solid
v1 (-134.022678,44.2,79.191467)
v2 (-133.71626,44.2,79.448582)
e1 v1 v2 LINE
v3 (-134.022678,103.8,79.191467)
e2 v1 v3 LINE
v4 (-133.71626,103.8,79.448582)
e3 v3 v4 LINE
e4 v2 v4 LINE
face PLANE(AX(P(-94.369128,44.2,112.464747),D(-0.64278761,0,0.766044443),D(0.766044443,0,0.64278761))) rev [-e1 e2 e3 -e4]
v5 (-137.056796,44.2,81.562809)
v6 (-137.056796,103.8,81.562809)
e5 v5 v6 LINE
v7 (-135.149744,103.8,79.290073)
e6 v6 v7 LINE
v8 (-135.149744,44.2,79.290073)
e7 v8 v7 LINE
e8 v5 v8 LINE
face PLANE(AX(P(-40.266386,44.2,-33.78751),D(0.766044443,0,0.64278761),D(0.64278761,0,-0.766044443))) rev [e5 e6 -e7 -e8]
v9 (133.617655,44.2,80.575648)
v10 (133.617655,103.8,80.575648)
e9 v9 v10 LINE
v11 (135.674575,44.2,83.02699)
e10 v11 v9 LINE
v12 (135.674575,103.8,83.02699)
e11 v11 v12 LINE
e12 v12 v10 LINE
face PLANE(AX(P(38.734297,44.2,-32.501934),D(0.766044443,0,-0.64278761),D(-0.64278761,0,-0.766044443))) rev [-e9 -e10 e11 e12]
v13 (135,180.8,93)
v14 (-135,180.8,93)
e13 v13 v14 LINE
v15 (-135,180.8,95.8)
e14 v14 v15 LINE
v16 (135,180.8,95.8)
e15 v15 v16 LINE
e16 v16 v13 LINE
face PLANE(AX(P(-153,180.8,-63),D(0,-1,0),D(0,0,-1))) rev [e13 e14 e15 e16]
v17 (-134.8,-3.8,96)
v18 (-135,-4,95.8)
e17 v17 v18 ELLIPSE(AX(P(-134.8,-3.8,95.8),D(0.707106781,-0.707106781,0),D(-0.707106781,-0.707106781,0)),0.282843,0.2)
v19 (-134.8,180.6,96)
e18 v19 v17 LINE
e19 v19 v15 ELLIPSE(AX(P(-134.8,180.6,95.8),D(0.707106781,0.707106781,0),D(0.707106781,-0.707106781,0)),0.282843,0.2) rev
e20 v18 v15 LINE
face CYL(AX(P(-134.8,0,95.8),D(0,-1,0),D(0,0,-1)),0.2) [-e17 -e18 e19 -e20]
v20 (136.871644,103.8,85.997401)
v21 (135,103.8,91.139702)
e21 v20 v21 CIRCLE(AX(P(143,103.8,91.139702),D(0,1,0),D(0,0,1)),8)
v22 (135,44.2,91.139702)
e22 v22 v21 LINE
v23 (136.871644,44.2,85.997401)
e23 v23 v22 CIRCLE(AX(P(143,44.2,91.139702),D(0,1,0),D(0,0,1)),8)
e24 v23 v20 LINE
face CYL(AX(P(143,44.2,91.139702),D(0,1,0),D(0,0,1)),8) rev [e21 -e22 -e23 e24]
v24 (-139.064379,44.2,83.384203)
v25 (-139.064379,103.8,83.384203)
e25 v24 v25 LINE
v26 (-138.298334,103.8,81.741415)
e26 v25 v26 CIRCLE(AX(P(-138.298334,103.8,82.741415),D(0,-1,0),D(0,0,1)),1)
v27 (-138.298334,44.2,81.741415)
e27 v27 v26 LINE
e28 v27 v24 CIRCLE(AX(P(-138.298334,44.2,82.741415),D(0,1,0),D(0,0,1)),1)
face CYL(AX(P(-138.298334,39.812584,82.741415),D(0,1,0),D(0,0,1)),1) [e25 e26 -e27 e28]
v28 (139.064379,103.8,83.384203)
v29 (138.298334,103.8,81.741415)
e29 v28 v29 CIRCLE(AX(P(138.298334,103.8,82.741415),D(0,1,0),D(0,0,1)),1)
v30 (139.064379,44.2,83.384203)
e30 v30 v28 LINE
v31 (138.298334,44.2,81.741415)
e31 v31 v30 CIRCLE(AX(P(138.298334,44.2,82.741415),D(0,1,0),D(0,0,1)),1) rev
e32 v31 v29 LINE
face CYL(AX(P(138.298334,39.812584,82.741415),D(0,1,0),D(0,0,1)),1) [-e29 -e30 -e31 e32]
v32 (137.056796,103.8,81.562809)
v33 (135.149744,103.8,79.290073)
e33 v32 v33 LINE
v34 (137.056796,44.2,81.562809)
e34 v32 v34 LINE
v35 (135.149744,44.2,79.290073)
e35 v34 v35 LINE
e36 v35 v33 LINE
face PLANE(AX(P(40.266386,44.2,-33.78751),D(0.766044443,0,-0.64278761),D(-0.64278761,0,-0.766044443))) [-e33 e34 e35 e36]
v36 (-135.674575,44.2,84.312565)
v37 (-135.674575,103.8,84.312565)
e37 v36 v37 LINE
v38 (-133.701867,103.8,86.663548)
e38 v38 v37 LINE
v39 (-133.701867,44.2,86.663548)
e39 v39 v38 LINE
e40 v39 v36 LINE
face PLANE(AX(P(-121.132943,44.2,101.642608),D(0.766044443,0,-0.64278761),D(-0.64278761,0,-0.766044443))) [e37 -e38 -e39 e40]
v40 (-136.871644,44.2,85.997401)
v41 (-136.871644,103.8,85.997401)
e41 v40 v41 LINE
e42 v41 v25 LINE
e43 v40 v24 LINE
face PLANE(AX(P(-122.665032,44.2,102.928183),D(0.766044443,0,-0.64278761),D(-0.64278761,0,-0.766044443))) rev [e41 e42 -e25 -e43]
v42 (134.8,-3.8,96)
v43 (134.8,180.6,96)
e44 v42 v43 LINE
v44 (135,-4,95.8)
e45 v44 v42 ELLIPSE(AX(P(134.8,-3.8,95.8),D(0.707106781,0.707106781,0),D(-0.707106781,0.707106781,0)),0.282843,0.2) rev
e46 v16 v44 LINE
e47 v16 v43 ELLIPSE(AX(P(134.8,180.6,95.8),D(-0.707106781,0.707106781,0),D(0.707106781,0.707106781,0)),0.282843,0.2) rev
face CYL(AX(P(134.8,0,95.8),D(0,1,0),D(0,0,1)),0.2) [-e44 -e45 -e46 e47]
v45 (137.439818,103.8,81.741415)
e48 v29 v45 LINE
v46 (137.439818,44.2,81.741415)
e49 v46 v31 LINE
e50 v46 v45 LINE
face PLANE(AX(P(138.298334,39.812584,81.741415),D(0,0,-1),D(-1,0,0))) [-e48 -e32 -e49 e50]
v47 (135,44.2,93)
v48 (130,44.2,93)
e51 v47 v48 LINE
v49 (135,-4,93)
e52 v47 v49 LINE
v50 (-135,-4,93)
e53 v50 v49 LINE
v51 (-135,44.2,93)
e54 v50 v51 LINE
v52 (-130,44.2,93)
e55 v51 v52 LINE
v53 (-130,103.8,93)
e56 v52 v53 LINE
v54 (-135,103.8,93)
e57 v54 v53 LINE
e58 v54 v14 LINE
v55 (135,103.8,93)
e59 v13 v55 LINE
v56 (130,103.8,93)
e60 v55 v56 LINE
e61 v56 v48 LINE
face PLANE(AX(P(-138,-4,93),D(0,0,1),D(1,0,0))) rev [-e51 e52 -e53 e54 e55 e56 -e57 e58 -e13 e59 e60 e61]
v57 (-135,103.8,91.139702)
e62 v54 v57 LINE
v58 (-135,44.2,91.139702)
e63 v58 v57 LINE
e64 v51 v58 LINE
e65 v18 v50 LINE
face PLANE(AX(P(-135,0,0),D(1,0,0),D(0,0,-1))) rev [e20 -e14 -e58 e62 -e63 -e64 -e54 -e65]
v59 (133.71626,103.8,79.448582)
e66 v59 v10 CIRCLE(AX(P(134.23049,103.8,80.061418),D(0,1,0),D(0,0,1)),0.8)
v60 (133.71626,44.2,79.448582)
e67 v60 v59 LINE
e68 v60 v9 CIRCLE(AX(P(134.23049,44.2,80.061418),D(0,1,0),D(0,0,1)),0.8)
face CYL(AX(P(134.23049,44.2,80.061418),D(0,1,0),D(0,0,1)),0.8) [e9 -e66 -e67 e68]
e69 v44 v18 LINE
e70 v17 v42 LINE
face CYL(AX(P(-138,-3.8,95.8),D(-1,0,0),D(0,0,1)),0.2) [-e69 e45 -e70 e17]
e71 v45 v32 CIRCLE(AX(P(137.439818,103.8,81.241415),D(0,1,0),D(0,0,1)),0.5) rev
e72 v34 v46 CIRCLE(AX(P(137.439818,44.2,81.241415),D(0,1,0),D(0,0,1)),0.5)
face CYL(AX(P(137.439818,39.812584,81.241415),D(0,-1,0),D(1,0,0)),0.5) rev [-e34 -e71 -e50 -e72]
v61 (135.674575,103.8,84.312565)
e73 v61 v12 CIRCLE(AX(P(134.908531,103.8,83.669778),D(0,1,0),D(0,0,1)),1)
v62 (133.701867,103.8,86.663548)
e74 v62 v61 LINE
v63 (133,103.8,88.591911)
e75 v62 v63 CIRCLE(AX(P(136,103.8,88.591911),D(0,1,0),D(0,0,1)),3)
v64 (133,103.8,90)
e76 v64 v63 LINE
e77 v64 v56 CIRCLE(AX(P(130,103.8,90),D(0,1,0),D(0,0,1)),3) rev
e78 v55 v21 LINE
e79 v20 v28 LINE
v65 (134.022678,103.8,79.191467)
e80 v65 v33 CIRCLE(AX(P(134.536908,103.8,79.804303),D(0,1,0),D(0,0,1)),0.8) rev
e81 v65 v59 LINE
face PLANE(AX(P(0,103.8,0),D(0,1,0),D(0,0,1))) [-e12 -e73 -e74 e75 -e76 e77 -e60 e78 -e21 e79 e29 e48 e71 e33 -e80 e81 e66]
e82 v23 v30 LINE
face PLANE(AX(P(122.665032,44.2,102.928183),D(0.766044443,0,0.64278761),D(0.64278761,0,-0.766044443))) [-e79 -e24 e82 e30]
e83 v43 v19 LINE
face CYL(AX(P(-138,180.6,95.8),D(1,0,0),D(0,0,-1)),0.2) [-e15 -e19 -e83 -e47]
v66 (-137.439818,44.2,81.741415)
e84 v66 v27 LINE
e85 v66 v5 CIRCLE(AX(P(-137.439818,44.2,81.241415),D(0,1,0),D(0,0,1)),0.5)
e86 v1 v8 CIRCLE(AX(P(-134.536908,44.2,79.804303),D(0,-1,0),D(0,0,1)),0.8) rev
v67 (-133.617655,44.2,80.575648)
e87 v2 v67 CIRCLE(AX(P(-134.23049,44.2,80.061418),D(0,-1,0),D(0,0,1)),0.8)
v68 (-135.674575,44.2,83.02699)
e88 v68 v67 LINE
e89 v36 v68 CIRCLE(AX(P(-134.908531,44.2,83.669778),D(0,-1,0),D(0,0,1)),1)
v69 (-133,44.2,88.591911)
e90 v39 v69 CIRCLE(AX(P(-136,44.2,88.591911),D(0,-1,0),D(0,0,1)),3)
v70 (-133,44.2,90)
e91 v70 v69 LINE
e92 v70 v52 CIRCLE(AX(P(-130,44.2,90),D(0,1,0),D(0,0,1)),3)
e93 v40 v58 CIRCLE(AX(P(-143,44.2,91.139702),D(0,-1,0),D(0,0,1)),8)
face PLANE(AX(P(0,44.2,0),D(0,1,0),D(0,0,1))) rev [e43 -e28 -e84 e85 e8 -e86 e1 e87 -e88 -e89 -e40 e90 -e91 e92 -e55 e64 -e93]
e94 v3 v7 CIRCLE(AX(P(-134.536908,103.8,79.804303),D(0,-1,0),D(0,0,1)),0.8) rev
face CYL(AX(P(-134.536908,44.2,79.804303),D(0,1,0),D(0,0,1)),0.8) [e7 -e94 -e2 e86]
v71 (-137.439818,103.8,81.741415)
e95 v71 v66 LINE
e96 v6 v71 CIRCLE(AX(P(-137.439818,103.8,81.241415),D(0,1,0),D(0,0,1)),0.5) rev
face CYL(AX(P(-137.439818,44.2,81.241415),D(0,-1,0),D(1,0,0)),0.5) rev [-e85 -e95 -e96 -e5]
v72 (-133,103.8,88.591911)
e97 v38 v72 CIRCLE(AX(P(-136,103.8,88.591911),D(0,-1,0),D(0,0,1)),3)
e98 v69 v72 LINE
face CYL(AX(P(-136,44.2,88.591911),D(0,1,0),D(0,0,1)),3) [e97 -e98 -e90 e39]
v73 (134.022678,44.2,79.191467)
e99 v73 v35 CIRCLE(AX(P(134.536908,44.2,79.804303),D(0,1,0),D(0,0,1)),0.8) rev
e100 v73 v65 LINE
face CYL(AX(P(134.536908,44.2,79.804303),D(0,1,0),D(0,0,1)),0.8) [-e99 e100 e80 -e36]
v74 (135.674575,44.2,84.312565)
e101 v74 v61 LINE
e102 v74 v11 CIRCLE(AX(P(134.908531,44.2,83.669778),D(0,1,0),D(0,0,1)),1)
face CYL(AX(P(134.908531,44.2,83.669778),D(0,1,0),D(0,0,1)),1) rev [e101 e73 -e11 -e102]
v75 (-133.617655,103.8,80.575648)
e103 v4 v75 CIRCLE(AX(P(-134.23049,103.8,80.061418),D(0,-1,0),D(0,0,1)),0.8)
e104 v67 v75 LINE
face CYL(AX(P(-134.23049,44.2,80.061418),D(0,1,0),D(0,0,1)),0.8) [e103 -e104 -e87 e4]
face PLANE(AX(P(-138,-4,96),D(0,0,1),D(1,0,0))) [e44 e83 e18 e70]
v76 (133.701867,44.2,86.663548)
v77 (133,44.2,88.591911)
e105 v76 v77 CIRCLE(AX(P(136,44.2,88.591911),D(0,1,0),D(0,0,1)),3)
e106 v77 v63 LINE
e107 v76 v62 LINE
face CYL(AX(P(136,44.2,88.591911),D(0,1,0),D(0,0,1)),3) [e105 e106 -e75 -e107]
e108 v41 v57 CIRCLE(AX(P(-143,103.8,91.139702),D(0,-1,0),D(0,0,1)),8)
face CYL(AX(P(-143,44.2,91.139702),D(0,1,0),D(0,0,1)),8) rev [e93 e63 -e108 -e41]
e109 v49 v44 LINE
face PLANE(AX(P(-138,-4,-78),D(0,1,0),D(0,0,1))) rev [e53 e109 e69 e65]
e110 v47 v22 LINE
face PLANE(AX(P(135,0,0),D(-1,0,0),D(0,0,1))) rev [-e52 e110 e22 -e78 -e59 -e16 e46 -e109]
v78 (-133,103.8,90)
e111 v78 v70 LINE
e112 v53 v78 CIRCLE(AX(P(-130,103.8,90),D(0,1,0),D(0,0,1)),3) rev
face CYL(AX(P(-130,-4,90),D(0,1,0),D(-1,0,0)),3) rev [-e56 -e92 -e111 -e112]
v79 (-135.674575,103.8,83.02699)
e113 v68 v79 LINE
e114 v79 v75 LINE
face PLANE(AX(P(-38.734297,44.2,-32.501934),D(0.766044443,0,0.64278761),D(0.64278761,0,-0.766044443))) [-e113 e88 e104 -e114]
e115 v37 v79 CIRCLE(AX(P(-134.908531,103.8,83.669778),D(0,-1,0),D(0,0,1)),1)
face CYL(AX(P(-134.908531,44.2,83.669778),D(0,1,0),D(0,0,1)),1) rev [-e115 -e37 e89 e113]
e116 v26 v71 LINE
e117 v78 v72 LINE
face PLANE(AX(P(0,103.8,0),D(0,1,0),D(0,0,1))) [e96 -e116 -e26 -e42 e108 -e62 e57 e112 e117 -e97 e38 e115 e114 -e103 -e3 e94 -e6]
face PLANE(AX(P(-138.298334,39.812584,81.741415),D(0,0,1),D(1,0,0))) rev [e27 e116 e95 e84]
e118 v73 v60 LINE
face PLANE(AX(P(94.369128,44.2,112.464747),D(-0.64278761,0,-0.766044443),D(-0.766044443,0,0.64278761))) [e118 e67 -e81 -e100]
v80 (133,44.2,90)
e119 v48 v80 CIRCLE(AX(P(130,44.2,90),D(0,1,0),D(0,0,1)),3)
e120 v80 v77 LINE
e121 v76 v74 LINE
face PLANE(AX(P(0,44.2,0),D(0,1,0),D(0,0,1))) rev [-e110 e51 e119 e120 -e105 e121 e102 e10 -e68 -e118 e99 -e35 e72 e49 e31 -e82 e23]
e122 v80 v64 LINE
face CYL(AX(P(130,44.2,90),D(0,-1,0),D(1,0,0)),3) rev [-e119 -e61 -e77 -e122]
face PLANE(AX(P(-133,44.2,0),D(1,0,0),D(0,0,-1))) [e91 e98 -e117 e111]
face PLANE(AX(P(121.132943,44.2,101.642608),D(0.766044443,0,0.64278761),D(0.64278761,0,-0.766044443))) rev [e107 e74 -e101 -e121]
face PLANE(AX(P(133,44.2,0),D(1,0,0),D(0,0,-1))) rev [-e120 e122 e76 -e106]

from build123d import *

# Parameters (mm, degrees)
STOCK_OUTTER_CASE_1_START     = -135
STOCK_OUTTER_CASE_1_OUTLINE_W = 184.8
STOCK_OUTTER_CASE_1_OUTLINE_H = 3
STOCK_OUTTER_CASE_1_DEPTH     = 270
FILLET1_R                     = 0.2
BOSS_EXTRUDE1_DEPTH           = 29.8
FILLET2_R                     = 3
FILLET2_OF_MIRROR1_R          = 3
BOSS_EXTRUDE2_DEPTH           = 59.6
FILLET3_R                     = 0.5


# Read off the part's stored shape, not the designer's step: Stock-outter_case-1
with BuildPart() as part:
    # Stock-outter_case-1 outline → Stock-outter_case-1 (new body)
    with BuildSketch(Plane.YZ.offset(STOCK_OUTTER_CASE_1_START)):
        with Locations((88.4, 94.5)):
            Rectangle(STOCK_OUTTER_CASE_1_OUTLINE_W, STOCK_OUTTER_CASE_1_OUTLINE_H)
    extrude(amount=STOCK_OUTTER_CASE_1_DEPTH)

    # Fillet1
    fillet1_edges = [part.edges().sort_by_distance(p)[0] for p in [
        (0, 180.8, 96),
        (0, -4, 96),
        (135, 88.4, 96),
        (-135, 88.4, 96),
    ]]
    fillet(fillet1_edges, radius=FILLET1_R)

    # Sketch2 → Boss-Extrude1 (add, symmetric)
    with BuildSketch(Plane(origin=(0, 74, 0), x_dir=(1, 0, 0), z_dir=(0, 1, 0))):
        with BuildLine():
            Line((133, -93), (135, -93))
            Line((135, -93), (135, -91.139702343))
            ThreePointArc((135, -91.139702343), (135.482459034, -88.403541196), (136.871644455, -85.997401465))
            Line((136.871644455, -85.997401465), (137.206664088, -85.598140613))
            ThreePointArc((137.206664088, -85.598140613), (137.908530759, -83.669777784), (137.206664088, -81.741414955))
            Line((137.206664088, -81.741414955), (135.149743737, -79.290072737))
            ThreePointArc((135.149743737, -79.290072737), (134.606632777, -79.007347067), (134.022678095, -79.191467271))
            Line((134.022678095, -79.191467271), (133.716260318, -79.448582314))
            ThreePointArc((133.716260318, -79.448582314), (133.433534647, -79.991693275), (133.617654851, -80.575647957))
            Line((133.617654851, -80.575647957), (135.674575202, -83.026990175))
            ThreePointArc((135.674575202, -83.026990175), (135.908530759, -83.669777784), (135.674575202, -84.312565394))
            Line((135.674575202, -84.312565394), (133.701866671, -86.663547874))
            ThreePointArc((133.701866671, -86.663547874), (133.180922138, -87.565850273), (133, -88.591910703))
            Line((133, -88.591910703), (133, -93))
        make_face()
    boss_extrude1 = extrude(amount=BOSS_EXTRUDE1_DEPTH, both=True)

    # Fillet2
    fillet2_edges = [part.edges().sort_by_distance(p)[0] for p in [
        (133, 74, 93),
    ]]
    fillet(fillet2_edges, radius=FILLET2_R)

    # Mirror1: Boss-Extrude1 across plane
    add(boss_extrude1.mirror(Plane(origin=(0, 0, 0), x_dir=(0, 0, 1), z_dir=(1, 0, 0))))

    # Fillet2 of Mirror1
    fillet2_of_mirror1_edges = [part.edges().sort_by_distance(p)[0] for p in [
        (-133, 74, 93),
    ]]
    fillet(fillet2_of_mirror1_edges, radius=FILLET2_OF_MIRROR1_R)

    # Sketch3 → Boss-Extrude2 (add)
    with BuildSketch(Plane(origin=(0, 103.8, 0), x_dir=(1, 0, 0), z_dir=(0, 1, 0))):
        with BuildLine():
            Line((137.206664088, -85.598140613), (139.064378688, -83.384202565))
            ThreePointArc((139.064378688, -83.384202565), (139.204642032, -82.318796694), (138.298334245, -81.741414955))
            Line((138.298334245, -81.741414955), (137.206664088, -81.741414955))
            Line((137.206664088, -81.741414955), (137.206664088, -85.598140613))
        make_face()
    boss_extrude2 = extrude(amount=-BOSS_EXTRUDE2_DEPTH)

    # Mirror2: Boss-Extrude2 across plane
    add(boss_extrude2.mirror(Plane(origin=(0, 0, 0), x_dir=(0, 0, 1), z_dir=(1, 0, 0))))

    # Fillet3
    fillet3_edges = [part.edges().sort_by_distance(p)[0] for p in [
        (137.206664088, 74, 81.741414955),
        (-137.206664088, 74, 81.741414955),
    ]]
    fillet(fillet3_edges, radius=FILLET3_R)


solid = part.part
